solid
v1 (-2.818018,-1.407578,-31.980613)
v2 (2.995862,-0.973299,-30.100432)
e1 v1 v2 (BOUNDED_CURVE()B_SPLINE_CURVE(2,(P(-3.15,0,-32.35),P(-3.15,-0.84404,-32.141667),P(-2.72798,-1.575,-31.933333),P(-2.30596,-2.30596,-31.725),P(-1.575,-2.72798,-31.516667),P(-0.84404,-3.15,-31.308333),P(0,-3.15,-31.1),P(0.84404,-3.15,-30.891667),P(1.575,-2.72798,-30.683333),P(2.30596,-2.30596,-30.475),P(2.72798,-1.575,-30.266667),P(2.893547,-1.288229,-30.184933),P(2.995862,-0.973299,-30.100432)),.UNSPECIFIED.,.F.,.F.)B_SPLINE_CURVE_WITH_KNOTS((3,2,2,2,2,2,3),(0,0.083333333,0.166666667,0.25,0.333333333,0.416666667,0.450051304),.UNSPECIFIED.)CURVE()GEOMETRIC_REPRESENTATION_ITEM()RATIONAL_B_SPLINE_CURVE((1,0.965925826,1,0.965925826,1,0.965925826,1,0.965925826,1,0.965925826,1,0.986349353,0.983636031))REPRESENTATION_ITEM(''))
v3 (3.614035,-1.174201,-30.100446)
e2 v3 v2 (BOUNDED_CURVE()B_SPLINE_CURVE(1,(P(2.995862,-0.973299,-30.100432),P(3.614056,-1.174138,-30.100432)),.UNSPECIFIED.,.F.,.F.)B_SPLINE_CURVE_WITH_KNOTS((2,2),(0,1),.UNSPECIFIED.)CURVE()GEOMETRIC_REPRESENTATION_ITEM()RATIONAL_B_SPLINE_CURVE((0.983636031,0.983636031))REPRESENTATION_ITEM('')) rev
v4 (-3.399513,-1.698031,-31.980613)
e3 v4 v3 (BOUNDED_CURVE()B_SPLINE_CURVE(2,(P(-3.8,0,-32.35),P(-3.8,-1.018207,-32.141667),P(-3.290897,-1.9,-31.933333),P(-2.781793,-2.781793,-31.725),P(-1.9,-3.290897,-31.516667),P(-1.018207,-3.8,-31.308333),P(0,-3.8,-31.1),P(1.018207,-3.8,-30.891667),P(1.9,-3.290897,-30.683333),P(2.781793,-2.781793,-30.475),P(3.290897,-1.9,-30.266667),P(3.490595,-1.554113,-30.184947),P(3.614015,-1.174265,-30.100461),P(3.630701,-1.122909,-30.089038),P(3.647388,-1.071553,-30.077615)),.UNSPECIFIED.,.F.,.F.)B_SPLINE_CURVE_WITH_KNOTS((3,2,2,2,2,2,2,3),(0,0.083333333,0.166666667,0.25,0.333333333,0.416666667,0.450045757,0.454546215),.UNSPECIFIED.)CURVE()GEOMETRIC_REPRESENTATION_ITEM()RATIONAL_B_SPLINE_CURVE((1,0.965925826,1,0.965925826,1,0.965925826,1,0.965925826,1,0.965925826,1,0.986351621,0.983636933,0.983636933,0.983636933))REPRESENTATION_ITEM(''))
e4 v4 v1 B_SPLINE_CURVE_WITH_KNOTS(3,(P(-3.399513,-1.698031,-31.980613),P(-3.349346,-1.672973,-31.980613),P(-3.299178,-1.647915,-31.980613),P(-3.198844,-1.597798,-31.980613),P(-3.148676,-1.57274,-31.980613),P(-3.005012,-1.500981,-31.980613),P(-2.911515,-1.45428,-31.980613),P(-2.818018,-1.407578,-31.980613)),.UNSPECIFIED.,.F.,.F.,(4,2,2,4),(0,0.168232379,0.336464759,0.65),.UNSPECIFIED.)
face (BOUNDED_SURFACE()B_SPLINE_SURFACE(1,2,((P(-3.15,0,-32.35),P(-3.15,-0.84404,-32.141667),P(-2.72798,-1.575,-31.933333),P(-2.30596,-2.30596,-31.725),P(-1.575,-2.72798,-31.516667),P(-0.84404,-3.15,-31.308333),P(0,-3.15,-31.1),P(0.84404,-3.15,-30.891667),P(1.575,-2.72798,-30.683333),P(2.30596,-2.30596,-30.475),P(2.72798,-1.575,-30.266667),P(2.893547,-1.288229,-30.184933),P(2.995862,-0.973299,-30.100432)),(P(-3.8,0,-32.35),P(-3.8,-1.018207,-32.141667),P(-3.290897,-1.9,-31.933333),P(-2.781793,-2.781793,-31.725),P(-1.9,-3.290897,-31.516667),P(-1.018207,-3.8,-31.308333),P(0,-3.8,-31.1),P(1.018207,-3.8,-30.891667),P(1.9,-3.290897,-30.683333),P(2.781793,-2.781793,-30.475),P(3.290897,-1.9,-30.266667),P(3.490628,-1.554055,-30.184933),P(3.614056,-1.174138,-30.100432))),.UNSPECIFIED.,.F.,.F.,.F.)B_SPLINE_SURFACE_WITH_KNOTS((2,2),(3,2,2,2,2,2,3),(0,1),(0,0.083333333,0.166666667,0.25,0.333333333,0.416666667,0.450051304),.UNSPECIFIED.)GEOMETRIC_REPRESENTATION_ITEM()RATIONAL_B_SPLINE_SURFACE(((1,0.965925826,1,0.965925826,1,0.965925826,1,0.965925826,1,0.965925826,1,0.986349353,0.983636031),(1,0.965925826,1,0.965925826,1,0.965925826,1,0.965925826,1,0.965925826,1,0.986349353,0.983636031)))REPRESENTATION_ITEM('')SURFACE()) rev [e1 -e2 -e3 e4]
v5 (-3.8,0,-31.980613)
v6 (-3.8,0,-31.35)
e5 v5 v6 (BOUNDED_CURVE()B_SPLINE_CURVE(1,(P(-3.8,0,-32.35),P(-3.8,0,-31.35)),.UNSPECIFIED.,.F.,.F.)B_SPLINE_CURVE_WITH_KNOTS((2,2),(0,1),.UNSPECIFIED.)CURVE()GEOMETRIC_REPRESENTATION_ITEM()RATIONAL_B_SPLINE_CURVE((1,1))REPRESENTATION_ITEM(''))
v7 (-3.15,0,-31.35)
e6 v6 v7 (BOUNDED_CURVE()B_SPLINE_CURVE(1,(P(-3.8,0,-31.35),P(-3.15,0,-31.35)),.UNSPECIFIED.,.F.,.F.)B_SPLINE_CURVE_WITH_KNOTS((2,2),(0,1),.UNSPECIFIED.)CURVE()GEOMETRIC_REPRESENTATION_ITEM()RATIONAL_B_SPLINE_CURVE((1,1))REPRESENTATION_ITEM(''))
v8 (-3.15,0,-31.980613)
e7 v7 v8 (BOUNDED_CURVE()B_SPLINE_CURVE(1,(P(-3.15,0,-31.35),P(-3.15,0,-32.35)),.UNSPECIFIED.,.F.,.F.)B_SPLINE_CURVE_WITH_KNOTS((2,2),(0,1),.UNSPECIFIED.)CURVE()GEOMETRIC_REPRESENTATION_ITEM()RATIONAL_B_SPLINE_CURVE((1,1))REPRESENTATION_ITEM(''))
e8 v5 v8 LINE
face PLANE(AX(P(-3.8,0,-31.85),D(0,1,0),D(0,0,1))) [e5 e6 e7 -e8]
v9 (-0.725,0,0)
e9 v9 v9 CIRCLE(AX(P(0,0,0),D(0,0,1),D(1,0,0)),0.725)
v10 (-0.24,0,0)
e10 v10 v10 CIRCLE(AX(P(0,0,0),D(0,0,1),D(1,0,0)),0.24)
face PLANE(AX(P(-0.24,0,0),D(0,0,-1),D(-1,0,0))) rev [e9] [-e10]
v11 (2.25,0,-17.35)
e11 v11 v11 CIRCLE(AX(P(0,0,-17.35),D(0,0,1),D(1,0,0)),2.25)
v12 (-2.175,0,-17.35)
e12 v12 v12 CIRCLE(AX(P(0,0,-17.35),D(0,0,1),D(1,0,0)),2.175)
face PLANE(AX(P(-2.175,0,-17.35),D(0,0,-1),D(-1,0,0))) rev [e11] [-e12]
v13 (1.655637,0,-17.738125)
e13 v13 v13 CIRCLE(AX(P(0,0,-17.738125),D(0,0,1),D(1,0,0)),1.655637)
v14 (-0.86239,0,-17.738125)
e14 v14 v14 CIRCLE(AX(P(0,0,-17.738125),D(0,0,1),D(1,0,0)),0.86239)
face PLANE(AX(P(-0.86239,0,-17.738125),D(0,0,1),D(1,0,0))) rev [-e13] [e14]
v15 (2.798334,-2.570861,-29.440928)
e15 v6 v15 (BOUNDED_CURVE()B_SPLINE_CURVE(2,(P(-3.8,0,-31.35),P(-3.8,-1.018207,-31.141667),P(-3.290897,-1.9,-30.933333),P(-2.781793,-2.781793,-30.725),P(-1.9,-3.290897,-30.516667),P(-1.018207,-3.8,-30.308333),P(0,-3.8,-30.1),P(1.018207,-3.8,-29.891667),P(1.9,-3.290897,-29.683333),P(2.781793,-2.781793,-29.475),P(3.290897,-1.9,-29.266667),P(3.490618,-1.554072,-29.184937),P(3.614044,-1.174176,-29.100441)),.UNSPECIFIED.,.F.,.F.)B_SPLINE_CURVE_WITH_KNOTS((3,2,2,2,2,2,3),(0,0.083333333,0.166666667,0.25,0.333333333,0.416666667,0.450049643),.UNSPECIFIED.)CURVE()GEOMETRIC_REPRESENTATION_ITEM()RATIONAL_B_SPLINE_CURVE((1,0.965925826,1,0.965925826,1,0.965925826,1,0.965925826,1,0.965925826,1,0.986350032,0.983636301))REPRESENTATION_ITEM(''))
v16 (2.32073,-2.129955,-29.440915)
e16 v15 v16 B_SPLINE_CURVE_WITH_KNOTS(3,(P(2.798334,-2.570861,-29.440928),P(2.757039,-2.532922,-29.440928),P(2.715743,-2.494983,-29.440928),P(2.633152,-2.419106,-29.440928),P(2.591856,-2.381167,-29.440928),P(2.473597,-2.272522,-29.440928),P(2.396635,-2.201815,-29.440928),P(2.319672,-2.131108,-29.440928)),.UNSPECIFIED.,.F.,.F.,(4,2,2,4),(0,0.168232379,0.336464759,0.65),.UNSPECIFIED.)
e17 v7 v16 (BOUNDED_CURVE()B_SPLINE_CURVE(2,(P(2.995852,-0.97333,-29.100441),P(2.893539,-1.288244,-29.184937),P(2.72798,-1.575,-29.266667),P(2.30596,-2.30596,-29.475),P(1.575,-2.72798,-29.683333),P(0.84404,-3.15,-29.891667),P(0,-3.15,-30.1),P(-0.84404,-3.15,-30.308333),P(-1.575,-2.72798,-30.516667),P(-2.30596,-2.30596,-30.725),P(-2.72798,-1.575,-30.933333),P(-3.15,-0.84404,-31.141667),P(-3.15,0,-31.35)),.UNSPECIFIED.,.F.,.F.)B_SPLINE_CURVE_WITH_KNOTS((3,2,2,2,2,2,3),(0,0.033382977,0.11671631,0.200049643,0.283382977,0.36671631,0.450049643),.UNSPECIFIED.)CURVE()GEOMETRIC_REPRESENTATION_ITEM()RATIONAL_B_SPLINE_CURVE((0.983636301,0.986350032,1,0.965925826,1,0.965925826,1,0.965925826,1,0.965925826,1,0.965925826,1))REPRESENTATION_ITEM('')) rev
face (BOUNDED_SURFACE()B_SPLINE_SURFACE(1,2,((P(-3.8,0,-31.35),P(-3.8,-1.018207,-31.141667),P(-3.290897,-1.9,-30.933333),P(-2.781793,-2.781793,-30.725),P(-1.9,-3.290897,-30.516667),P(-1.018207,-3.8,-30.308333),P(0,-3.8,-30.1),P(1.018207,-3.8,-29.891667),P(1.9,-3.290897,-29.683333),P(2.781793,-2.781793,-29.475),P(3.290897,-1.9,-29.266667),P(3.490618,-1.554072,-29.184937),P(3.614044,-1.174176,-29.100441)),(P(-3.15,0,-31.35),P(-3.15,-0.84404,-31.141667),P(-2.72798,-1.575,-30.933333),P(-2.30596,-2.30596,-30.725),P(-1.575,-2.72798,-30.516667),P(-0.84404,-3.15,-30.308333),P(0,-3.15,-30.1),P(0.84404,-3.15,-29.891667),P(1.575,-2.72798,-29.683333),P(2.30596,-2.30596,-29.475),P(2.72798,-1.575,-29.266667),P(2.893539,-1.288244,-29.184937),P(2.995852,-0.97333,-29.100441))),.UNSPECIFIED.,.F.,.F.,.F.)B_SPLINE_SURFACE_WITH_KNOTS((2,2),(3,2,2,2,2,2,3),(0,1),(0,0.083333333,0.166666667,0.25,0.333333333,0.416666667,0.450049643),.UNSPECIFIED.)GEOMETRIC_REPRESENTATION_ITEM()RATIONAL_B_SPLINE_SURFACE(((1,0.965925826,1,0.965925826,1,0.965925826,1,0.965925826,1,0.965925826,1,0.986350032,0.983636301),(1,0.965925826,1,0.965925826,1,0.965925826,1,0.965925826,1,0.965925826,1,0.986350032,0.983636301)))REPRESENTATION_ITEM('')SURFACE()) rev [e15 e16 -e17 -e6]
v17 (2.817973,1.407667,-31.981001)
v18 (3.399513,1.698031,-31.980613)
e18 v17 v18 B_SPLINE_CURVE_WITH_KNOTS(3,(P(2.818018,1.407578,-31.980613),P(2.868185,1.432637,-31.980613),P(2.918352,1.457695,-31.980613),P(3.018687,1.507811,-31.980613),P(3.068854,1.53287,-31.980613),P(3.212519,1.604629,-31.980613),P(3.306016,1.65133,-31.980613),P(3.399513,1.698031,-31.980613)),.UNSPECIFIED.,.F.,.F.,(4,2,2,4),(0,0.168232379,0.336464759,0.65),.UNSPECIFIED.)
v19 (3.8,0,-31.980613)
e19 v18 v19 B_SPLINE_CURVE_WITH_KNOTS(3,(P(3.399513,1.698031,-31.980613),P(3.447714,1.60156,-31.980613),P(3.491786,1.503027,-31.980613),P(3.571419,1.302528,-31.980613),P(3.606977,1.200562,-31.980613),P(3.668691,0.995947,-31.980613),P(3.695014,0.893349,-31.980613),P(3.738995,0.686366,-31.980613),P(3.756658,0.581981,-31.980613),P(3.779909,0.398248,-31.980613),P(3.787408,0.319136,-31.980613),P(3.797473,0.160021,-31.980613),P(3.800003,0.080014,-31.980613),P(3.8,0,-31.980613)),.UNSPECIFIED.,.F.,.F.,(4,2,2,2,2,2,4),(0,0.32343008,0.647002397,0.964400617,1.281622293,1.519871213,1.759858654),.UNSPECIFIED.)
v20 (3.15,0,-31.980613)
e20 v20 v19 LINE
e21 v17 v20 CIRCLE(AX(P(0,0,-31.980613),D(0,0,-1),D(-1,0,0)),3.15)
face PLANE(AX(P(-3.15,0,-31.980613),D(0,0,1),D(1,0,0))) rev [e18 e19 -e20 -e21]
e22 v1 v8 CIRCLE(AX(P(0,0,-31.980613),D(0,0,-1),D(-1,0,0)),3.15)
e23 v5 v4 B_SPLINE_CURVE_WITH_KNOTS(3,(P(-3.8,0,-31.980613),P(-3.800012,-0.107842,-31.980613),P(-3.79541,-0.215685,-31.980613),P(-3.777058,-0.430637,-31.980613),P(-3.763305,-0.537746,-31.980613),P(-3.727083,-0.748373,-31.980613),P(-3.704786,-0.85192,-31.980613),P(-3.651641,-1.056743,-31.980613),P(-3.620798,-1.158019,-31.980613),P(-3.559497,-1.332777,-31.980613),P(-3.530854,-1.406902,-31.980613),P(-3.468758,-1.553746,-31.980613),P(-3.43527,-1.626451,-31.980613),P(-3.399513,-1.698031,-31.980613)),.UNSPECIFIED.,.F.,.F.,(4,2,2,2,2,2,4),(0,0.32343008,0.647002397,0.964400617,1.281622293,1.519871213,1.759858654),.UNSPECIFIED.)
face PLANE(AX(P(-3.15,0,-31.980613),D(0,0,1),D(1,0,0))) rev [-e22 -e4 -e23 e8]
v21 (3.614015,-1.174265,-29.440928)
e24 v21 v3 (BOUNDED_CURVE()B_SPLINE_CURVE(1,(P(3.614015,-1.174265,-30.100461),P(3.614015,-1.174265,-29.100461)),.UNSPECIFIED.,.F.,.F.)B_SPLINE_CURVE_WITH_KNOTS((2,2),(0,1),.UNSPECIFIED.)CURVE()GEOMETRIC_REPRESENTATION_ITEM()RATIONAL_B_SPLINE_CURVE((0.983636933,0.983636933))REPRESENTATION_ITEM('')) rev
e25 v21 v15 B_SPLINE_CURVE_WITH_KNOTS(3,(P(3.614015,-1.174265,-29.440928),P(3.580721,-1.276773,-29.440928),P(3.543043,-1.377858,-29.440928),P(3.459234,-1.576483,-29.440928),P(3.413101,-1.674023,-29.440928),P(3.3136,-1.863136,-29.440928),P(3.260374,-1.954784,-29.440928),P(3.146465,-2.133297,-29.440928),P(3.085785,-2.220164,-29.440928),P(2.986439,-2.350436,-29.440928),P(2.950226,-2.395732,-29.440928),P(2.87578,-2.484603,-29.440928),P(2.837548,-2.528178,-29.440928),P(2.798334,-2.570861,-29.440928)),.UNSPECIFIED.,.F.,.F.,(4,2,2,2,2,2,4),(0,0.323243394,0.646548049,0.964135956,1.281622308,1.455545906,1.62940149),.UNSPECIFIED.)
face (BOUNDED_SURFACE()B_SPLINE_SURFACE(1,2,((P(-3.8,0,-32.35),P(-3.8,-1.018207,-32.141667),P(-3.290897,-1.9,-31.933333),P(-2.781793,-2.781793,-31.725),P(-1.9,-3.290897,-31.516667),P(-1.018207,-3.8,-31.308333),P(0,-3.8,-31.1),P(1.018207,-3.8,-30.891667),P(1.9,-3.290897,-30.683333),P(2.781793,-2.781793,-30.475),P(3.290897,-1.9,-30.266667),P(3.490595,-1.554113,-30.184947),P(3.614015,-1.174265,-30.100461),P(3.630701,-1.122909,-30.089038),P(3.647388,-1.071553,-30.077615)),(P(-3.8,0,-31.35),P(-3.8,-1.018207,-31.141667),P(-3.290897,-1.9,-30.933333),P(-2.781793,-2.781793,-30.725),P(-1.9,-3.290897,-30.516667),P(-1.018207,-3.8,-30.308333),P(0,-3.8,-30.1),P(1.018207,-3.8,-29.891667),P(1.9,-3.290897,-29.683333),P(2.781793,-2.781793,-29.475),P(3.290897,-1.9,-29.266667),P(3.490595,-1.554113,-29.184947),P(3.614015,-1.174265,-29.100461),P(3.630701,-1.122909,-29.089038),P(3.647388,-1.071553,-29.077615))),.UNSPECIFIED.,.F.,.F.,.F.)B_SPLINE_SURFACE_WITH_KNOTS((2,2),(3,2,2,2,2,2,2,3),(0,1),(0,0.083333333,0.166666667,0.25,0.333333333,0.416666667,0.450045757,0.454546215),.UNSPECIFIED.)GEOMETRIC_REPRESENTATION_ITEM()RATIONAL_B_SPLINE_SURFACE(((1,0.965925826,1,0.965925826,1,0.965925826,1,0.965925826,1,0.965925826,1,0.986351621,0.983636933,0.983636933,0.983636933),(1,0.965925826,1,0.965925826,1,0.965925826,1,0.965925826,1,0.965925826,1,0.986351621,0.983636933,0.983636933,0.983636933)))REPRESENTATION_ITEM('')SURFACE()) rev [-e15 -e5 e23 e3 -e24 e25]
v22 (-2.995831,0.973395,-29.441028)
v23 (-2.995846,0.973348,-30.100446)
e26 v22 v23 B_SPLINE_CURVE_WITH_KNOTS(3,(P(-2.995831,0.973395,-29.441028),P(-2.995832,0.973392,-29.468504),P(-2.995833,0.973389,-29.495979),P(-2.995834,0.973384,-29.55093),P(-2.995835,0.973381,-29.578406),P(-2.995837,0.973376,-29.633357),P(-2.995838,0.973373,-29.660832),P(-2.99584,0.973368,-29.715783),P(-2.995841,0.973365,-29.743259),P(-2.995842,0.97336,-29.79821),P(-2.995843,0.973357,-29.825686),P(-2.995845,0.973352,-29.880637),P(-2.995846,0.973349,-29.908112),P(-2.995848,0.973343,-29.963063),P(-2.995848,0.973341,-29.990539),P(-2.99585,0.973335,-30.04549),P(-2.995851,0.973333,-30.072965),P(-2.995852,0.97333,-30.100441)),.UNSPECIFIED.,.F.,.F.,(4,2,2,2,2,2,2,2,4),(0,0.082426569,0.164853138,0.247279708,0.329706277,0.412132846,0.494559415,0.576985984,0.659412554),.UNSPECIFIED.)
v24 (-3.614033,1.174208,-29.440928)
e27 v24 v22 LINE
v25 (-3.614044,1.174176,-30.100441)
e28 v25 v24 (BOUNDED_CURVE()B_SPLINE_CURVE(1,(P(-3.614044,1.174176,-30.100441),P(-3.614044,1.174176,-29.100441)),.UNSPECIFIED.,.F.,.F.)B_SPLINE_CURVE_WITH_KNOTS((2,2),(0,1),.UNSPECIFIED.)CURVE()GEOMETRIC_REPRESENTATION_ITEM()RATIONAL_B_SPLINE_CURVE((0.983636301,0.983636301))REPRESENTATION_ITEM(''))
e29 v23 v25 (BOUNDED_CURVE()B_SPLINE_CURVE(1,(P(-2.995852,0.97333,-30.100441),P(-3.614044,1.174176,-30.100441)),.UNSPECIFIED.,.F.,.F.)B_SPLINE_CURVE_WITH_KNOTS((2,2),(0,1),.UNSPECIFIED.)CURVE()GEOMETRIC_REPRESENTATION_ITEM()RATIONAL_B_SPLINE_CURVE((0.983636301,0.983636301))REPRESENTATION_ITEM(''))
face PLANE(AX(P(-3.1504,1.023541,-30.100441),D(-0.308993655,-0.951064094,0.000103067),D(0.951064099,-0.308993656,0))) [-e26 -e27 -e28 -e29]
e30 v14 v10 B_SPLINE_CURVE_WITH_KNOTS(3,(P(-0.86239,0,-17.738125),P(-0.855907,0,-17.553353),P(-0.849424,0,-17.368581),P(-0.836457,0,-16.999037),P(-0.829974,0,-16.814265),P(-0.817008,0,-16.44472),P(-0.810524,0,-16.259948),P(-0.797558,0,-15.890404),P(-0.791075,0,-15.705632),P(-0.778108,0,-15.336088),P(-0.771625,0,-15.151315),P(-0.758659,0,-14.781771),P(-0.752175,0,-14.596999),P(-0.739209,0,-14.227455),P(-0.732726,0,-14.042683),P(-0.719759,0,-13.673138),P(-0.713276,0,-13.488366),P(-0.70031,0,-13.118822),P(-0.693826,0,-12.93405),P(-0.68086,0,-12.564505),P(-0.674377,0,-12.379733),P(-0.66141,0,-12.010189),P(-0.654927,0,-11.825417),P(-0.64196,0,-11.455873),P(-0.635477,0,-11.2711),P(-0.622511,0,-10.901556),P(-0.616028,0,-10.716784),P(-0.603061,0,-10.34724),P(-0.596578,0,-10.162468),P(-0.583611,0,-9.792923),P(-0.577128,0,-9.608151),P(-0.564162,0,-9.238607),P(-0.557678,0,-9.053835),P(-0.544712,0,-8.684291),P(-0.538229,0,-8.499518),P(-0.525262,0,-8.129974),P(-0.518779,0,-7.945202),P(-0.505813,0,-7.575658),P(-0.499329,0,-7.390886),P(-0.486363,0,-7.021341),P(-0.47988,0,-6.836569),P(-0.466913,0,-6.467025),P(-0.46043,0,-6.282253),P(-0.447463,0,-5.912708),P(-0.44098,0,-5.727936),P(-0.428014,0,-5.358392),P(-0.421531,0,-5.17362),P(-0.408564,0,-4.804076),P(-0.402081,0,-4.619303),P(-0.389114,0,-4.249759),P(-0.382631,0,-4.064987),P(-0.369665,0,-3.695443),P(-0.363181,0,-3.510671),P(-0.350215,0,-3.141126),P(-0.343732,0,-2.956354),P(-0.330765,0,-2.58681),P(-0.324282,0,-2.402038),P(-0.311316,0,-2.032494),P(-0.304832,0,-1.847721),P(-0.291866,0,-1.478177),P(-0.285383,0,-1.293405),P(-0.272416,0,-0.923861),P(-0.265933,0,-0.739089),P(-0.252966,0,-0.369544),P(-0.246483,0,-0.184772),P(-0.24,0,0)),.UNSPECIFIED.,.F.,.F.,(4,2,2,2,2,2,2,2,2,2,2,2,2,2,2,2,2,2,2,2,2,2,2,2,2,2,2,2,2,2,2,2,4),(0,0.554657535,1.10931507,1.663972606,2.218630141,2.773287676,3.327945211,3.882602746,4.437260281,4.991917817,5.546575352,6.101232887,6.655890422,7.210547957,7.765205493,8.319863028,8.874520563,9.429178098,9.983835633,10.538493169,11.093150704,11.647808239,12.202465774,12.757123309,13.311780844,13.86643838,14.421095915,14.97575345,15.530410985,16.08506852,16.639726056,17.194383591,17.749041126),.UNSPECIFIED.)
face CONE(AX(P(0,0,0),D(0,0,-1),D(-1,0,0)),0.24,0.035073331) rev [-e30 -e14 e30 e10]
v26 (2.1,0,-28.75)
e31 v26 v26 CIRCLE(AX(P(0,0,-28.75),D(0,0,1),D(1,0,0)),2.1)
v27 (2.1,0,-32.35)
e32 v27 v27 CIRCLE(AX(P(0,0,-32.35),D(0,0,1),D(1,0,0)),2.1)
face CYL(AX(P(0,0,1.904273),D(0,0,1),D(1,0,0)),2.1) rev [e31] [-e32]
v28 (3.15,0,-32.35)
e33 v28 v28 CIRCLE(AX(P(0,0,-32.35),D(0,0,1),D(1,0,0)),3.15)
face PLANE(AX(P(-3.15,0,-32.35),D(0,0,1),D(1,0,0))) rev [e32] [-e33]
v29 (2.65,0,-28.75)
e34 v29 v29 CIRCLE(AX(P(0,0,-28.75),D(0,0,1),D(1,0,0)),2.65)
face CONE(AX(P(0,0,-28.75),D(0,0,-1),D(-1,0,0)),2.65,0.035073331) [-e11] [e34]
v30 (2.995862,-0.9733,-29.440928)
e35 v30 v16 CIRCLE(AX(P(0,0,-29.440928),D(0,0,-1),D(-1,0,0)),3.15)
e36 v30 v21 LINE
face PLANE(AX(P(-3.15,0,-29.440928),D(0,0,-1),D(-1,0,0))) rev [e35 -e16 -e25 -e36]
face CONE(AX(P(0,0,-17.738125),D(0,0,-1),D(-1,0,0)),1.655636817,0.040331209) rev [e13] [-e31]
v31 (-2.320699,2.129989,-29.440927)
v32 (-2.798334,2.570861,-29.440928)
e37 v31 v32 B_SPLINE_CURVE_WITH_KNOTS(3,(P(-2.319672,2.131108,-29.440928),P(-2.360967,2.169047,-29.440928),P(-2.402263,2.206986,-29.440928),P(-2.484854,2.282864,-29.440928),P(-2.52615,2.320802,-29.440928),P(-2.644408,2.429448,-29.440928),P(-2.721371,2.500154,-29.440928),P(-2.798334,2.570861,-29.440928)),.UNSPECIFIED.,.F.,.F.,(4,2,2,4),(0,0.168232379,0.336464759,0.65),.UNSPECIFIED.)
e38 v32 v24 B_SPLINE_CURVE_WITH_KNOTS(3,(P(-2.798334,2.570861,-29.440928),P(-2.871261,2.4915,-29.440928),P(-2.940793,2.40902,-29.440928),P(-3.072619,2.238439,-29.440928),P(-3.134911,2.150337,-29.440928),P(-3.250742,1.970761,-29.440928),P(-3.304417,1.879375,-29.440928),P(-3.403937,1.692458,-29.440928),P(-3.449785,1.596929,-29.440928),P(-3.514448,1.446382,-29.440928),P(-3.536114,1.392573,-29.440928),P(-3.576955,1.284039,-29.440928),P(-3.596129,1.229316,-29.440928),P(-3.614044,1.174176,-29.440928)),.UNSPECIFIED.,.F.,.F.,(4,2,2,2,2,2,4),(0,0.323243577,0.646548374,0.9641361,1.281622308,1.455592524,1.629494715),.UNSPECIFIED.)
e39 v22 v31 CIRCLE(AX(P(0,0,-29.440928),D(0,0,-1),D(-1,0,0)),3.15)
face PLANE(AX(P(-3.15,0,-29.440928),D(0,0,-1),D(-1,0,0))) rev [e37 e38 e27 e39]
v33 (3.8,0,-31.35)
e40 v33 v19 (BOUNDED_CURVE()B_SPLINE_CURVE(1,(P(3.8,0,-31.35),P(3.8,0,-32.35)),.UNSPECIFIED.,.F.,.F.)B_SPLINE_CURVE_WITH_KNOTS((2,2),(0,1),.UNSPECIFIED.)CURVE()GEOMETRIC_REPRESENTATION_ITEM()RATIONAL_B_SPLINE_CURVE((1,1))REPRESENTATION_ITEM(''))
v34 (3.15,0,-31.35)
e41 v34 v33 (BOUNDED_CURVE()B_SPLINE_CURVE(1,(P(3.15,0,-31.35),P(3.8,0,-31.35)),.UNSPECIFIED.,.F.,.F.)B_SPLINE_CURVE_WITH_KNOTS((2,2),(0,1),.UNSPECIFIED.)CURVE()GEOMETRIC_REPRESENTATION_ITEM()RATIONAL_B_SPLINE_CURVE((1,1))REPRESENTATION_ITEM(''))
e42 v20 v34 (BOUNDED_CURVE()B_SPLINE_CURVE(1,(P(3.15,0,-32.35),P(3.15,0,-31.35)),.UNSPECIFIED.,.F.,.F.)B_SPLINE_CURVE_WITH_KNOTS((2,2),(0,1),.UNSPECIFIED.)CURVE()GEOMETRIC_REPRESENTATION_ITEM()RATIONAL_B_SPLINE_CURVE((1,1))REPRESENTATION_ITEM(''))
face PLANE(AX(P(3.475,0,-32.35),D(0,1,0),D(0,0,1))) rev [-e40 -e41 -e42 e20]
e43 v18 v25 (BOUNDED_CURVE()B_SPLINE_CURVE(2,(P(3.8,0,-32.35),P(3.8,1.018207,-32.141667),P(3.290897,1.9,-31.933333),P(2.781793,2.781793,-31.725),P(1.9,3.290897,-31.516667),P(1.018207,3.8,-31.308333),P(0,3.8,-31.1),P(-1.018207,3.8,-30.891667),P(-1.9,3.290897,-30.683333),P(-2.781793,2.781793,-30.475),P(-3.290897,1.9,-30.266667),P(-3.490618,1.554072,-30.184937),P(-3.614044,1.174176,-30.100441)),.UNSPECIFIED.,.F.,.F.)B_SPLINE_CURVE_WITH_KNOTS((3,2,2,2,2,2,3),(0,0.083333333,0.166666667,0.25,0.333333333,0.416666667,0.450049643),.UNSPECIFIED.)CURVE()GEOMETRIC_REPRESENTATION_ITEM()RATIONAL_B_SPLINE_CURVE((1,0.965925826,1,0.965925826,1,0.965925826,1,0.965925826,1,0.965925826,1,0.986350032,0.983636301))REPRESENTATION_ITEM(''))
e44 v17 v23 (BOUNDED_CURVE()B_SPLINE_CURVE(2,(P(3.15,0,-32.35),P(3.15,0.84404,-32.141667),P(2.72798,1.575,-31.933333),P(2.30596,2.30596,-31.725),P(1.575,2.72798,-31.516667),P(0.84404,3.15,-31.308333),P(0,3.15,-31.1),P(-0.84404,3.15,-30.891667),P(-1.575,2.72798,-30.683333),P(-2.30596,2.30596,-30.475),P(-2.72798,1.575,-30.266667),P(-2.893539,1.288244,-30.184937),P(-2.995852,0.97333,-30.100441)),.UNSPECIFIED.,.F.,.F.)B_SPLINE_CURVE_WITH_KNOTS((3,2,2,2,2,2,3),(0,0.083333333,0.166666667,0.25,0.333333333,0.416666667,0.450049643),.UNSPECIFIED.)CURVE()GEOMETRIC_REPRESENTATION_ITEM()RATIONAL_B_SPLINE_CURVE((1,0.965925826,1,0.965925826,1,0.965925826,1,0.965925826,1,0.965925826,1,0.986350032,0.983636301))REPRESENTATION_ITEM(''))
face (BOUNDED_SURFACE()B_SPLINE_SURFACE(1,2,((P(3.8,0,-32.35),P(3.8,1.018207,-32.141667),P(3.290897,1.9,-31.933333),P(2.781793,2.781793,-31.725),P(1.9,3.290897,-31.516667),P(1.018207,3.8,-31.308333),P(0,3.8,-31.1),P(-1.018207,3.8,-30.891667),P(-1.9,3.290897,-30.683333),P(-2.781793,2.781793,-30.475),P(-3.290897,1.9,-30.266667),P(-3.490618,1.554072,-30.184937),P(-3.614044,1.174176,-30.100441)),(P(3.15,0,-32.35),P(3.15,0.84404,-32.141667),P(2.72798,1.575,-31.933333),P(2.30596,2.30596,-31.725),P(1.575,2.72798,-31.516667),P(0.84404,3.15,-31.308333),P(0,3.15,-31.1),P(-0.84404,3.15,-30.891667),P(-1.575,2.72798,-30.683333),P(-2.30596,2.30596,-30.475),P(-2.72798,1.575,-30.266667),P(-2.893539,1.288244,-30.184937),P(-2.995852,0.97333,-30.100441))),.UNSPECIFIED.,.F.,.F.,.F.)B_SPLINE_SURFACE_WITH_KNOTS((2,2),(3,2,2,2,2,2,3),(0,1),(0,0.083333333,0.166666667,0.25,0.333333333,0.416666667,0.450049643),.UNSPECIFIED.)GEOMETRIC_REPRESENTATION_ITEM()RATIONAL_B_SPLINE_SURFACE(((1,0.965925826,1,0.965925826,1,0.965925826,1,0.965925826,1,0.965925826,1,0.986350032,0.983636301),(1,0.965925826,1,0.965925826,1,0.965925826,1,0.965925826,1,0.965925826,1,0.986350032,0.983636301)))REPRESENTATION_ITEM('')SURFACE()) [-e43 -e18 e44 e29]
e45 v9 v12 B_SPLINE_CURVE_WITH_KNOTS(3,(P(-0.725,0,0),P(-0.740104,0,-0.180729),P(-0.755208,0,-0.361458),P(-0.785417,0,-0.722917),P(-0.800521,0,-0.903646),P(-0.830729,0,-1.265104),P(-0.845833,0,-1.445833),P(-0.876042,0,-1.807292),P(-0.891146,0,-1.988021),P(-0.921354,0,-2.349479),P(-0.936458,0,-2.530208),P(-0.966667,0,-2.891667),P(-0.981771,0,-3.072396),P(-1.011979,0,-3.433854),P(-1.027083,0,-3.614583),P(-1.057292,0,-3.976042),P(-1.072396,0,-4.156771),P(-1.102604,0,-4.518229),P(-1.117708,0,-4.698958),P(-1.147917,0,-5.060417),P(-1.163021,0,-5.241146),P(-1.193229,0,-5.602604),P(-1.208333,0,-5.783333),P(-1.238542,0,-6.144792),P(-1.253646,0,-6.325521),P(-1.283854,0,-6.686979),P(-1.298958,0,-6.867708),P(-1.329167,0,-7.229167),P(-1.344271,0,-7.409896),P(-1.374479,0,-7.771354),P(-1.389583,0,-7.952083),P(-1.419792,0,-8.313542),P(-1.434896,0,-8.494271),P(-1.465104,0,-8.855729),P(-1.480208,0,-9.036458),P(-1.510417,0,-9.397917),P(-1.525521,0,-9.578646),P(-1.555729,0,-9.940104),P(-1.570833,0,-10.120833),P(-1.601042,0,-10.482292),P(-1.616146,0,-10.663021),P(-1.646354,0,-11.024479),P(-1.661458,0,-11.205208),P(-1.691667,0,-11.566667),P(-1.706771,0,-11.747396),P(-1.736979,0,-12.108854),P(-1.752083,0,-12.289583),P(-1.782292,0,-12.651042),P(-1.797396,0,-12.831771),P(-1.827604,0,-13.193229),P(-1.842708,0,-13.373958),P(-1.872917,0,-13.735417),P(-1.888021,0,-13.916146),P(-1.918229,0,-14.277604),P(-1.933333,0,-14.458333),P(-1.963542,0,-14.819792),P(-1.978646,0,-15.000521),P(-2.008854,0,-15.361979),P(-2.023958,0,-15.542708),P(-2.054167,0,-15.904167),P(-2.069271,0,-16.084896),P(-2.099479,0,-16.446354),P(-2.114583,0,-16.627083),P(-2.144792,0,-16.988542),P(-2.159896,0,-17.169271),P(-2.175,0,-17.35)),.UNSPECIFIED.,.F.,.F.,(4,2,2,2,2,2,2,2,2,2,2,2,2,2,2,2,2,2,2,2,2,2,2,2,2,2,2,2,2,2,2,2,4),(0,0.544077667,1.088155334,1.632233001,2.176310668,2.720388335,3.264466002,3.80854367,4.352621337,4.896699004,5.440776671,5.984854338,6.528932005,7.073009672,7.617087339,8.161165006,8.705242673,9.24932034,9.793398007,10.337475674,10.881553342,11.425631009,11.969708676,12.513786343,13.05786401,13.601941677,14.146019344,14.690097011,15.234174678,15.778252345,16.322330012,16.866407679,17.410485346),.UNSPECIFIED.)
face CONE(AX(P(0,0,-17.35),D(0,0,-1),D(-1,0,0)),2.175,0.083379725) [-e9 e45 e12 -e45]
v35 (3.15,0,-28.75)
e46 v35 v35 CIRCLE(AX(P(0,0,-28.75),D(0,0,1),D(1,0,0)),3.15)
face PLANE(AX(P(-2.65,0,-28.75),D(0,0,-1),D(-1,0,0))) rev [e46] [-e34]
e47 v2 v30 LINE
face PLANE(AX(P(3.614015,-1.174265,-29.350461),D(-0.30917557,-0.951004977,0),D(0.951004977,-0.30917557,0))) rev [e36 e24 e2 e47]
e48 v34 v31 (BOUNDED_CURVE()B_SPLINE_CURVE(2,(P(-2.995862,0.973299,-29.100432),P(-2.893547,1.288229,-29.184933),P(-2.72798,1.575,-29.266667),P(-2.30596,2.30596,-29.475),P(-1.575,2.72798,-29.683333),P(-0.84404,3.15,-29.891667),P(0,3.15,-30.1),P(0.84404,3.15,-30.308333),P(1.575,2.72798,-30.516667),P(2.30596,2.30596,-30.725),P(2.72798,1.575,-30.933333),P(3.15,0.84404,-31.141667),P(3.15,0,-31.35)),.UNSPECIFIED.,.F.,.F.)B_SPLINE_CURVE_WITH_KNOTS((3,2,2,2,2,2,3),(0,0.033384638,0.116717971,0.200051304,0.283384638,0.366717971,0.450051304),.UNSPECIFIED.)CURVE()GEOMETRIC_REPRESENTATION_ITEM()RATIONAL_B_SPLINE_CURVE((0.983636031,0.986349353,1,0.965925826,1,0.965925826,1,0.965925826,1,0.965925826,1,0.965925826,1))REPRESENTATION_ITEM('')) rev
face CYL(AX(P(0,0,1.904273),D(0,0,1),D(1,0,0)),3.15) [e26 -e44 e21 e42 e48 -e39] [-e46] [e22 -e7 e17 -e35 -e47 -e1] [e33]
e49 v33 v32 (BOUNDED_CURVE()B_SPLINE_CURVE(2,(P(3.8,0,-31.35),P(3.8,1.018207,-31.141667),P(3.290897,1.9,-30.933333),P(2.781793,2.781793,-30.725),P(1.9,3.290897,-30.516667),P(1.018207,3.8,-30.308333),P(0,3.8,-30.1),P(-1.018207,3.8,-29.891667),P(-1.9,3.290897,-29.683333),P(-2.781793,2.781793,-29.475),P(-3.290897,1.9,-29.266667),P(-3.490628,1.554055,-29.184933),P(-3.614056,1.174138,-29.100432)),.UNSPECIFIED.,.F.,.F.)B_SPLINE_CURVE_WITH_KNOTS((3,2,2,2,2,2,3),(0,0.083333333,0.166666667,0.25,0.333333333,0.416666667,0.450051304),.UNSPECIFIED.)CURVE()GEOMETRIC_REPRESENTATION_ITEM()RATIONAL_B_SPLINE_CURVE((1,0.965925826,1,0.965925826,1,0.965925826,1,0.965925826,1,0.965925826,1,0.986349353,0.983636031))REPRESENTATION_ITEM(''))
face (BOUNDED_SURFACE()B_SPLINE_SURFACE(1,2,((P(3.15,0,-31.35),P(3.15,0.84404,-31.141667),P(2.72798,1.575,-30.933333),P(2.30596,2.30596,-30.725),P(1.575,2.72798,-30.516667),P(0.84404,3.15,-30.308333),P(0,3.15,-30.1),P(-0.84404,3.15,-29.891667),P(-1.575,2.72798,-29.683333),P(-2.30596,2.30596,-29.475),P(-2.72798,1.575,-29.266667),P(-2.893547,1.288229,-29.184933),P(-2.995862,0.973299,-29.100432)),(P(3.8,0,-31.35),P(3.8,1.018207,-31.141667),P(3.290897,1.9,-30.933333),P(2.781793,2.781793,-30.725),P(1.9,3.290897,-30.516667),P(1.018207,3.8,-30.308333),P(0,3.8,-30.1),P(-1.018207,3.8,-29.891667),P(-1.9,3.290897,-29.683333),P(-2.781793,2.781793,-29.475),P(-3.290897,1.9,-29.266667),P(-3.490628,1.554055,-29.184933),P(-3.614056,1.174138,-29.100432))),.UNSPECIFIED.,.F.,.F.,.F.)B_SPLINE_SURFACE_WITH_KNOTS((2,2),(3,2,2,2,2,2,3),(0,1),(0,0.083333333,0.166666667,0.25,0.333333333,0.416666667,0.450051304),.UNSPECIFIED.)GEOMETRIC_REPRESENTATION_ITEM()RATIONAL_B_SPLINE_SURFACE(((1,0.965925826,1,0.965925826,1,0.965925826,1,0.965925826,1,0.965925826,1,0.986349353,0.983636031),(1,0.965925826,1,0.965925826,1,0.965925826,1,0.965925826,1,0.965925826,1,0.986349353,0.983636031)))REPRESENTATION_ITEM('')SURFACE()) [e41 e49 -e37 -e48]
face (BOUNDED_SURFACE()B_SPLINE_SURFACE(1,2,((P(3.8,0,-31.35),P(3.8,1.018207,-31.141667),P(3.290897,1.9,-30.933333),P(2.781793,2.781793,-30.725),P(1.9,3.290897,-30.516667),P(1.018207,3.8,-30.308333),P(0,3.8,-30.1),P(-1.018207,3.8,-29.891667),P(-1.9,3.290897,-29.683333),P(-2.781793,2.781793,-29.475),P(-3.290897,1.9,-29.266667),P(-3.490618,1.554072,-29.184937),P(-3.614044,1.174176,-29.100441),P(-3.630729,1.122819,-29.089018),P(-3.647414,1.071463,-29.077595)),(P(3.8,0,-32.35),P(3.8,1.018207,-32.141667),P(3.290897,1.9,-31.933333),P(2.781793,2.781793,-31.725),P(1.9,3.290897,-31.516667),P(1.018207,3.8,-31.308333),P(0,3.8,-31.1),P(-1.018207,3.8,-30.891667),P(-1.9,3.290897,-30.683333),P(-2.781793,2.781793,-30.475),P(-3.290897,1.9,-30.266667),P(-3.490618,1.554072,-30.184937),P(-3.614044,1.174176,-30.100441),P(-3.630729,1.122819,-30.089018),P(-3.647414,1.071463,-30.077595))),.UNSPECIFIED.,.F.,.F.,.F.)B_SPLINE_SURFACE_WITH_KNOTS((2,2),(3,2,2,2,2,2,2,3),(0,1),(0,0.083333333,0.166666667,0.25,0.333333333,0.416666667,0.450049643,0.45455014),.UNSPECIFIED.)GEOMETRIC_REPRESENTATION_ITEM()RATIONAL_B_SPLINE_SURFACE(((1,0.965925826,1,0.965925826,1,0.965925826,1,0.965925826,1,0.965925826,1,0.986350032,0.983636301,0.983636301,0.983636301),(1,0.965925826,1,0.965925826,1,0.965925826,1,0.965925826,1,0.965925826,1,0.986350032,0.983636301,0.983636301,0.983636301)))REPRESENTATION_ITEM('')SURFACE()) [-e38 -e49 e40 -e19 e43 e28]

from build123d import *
from build123d.topology import SkipClean

# Parameters (mm, degrees)
SWEEP1_PITCH       = 5
SWEEP1_HEIGHT      = 2.25
SWEEP1_RADIUS      = 3.15
SWEEP1_START_ANGLE = 180
SKETCH3_W          = 0.65
SKETCH3_H          = 1
SKETCH4_W          = 0.868914335
SKETCH4_H          = 0.369387361
SKETCH4_W_2        = 0.738311658
SKETCH4_H_2        = 0.690928268


with BuildPart() as part:
    # Sketch1 → Revolve1 (revolve)
    with BuildSketch(Plane(origin=(0, 0, 0), x_dir=(1, 0, 0), z_dir=(0, 1, 0)), mode=Mode.PRIVATE) as revolve1_sk:
        Polygon((-0.24, 0), (-0.725, 0), (-2.175, 17.35), (-2.25, 17.35), (-2.65, 28.75), (-3.15, 28.75), (-3.15, 32.35), (-2.1, 32.35), (-2.1, 28.75), (-1.655636817, 17.738125355), (-0.862390363, 17.738125355), align=None)
    revolve(revolve1_sk.sketch.rotate(Axis((0, 0, 1.904272973), (0, 0, -1)), 180), axis=Axis((0, 0, 1.904272973), (0, 0, -1)))

    # Sweep1: sweep along a helix
    with BuildLine() as sweep1_path:
        add(Helix(SWEEP1_PITCH, SWEEP1_HEIGHT, SWEEP1_RADIUS, center=(0, 0, -32.35), direction=(0, 0, 1), mode=Mode.PRIVATE).rotate(Axis((0, 0, -32.35), (0, 0, 1)), SWEEP1_START_ANGLE))
    # Sketch3 → Sweep1 (sweep)
    with BuildSketch(Plane(origin=(0, 0, 0), x_dir=(1, 0, 0), z_dir=(0, 1, 0))):
        with Locations((-3.475, 31.85)):
            Rectangle(SKETCH3_W, SKETCH3_H)
        with Locations((3.475, 31.85)):
            Rectangle(SKETCH3_W, SKETCH3_H)
    sweep(path=sweep1_path.line, is_frenet=True)

    # Sketch4 → Cut-Revolve1 (revolve, cut)
    with SkipClean():  # the faces are left unmerged after this step: merging them gives an invalid solid
        with BuildSketch(Plane(origin=(0, 0, 0), x_dir=(1, 0, 0), z_dir=(0, 1, 0))):
            with Locations((-3.584457168, 32.16530632)):
                Rectangle(SKETCH4_W, SKETCH4_H)
            with Locations((-3.519155829, 29.095464134)):
                Rectangle(SKETCH4_W_2, SKETCH4_H_2)
        revolve(axis=Axis((0, 0, -32.799017305), (0, 0, 1)), mode=Mode.SUBTRACT)


solid = part.part
